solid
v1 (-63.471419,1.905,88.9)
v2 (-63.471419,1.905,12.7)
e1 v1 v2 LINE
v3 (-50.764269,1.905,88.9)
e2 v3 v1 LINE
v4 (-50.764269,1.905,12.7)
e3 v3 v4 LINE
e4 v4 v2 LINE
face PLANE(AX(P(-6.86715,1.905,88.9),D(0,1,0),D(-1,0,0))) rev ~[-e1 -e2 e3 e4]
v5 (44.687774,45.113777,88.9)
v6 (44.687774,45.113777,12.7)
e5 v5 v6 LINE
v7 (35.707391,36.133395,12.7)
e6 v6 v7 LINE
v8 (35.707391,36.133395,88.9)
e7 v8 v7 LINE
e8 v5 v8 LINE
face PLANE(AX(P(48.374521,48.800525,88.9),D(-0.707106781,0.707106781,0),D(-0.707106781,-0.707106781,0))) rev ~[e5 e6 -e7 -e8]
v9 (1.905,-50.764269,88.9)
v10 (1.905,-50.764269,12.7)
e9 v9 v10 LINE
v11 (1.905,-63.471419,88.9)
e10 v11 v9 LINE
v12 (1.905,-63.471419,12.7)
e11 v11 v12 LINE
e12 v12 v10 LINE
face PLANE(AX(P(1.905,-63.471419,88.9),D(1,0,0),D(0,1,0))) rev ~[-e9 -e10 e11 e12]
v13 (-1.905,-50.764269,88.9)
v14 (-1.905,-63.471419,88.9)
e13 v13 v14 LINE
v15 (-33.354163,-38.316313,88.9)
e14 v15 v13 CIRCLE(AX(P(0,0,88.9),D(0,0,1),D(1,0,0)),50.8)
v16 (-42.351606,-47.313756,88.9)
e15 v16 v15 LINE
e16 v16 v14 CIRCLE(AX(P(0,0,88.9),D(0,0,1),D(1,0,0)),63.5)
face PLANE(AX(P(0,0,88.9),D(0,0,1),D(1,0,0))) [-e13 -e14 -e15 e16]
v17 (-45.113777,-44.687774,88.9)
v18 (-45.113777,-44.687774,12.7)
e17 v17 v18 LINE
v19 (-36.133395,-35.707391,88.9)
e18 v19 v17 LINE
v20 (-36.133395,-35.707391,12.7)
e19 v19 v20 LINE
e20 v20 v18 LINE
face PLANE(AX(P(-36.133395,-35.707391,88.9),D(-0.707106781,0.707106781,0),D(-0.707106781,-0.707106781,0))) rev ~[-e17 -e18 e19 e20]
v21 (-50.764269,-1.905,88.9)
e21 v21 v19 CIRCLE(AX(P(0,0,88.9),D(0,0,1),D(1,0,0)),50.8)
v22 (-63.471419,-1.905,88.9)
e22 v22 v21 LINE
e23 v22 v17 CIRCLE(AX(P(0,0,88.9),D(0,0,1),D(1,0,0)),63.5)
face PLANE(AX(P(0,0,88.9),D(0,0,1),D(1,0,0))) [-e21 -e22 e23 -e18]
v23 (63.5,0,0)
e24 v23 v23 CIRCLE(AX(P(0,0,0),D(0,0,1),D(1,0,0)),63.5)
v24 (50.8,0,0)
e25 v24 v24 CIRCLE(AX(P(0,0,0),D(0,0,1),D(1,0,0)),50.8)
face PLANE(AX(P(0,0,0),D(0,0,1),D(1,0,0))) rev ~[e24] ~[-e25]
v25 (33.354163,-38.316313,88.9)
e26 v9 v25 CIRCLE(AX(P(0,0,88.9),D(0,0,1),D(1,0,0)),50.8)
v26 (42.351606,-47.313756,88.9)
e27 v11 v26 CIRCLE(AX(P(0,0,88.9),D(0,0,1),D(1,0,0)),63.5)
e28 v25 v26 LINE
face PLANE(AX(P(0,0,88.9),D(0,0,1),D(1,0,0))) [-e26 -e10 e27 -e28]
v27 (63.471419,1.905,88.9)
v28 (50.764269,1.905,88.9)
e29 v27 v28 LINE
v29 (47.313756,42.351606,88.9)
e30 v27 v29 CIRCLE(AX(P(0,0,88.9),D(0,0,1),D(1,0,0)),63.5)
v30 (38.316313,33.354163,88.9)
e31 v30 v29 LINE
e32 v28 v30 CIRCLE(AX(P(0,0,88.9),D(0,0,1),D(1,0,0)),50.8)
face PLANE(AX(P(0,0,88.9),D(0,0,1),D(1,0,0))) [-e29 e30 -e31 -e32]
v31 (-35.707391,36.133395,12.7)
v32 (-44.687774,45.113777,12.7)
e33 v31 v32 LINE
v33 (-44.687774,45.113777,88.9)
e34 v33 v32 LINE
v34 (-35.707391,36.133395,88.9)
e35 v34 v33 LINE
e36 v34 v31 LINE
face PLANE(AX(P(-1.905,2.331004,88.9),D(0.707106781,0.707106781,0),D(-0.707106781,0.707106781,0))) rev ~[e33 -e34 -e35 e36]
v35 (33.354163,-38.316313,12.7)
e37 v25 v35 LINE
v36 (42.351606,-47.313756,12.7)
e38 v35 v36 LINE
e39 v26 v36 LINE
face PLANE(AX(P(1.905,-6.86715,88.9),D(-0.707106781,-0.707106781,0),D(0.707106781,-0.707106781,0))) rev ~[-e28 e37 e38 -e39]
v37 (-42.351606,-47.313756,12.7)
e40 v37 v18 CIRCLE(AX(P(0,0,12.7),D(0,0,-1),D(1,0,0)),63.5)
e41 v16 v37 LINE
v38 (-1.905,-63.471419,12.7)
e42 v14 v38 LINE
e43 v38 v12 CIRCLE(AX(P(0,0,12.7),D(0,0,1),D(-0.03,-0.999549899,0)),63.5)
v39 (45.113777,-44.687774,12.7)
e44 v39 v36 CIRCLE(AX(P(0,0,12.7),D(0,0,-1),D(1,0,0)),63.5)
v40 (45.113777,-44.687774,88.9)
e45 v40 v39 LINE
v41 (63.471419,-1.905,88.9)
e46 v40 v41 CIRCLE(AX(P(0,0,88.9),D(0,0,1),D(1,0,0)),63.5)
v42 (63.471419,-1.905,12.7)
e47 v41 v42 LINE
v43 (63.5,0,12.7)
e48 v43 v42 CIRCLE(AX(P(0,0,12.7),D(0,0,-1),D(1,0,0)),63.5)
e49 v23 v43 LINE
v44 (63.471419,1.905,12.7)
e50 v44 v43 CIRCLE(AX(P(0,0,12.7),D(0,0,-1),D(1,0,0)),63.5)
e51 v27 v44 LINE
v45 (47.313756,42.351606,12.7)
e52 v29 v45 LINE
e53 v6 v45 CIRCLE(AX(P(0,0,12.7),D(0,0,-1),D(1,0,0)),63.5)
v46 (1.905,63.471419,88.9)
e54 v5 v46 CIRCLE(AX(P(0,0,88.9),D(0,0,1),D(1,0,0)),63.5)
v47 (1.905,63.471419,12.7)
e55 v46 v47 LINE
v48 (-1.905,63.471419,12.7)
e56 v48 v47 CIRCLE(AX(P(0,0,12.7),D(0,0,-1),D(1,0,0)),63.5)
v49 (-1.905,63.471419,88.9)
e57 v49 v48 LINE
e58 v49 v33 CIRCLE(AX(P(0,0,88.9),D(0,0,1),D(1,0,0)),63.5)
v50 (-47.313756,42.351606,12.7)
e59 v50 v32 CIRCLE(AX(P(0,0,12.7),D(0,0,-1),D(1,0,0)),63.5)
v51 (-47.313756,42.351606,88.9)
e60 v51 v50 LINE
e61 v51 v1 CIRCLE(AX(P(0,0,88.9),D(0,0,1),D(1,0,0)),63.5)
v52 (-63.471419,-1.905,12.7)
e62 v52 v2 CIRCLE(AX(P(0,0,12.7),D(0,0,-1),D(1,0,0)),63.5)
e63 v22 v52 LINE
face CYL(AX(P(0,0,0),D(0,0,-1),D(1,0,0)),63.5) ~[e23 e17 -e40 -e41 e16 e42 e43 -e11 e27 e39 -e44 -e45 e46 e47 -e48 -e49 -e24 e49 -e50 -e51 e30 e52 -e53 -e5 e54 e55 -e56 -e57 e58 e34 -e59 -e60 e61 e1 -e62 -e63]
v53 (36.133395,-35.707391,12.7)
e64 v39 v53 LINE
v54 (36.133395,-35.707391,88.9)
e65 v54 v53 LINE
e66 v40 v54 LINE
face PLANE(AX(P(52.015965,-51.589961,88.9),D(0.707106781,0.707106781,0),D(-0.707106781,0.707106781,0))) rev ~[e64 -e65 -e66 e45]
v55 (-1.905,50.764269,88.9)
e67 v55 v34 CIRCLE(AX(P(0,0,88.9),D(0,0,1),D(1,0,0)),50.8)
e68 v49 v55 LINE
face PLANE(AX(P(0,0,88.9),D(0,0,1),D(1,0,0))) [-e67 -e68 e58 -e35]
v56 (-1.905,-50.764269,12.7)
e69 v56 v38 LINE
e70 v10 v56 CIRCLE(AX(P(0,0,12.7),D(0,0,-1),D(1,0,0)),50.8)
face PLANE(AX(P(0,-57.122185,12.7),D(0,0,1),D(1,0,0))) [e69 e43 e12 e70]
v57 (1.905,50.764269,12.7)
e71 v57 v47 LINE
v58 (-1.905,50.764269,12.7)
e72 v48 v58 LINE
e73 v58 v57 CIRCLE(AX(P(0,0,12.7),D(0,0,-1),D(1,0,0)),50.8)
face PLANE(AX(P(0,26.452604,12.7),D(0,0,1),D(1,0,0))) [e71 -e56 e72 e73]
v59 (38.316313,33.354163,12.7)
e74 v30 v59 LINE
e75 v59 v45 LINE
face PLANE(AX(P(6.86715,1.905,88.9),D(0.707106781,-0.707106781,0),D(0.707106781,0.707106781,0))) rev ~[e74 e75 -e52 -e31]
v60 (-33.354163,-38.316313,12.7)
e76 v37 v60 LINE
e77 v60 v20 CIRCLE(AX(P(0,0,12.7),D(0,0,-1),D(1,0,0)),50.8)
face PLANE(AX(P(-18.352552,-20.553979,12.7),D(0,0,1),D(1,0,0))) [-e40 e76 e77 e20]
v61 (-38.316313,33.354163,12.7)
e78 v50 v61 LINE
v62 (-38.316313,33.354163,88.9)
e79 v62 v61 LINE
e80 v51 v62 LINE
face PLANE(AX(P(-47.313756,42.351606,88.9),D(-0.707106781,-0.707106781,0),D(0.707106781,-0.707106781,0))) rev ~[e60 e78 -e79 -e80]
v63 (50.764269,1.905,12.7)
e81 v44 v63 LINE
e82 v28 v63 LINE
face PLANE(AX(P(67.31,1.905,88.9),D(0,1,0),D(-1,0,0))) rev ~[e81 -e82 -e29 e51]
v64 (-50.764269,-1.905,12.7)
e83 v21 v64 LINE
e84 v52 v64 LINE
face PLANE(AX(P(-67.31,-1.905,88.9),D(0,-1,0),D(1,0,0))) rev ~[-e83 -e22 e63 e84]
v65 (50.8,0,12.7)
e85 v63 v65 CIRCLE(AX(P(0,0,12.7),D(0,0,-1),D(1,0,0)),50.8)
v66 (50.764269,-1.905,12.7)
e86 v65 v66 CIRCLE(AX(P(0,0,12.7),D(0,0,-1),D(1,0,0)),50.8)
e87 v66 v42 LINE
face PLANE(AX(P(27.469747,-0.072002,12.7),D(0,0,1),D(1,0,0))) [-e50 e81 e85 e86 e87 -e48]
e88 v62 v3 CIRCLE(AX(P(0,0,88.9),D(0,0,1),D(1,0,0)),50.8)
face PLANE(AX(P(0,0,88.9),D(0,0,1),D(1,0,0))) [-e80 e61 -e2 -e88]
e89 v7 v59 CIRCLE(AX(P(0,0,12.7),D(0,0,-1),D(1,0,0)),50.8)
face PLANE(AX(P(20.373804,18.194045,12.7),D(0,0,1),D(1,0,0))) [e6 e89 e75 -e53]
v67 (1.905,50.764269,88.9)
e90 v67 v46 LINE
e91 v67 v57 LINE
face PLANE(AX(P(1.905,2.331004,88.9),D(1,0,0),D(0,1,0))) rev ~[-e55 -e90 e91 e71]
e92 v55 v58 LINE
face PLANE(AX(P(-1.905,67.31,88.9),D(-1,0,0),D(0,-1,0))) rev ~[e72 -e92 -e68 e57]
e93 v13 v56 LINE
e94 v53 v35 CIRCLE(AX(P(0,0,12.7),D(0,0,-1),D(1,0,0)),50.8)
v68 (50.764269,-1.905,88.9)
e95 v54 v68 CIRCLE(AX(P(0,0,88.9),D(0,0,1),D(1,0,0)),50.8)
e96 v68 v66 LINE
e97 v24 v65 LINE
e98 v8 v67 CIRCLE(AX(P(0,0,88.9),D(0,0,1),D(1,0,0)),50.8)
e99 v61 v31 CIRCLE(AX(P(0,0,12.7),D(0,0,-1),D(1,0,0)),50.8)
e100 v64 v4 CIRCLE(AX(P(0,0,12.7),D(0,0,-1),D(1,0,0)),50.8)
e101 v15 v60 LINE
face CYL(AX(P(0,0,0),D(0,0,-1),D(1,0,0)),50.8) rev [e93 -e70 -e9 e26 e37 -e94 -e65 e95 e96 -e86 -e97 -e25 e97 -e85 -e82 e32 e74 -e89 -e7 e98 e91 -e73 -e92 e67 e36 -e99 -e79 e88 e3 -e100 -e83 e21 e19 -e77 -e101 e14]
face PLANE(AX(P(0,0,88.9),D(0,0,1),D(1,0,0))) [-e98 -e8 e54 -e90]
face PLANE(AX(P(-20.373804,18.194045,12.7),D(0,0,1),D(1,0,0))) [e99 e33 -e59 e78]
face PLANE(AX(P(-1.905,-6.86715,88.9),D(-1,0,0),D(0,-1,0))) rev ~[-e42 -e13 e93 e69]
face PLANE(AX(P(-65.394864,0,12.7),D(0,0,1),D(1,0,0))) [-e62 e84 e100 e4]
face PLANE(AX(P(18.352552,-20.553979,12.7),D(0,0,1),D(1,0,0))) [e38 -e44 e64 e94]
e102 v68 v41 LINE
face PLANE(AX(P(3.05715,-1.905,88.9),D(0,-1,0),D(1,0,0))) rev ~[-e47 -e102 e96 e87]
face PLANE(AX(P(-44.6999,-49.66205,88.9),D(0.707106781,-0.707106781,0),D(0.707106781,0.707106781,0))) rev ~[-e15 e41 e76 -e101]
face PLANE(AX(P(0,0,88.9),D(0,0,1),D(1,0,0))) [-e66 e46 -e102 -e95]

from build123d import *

# Parameters (mm, degrees)
F0_R     = 63.5
F0_R_2   = 50.8
F1_DEPTH = 88.9
F4_DEPTH = 76.2


# Not quite as in the source:
# - a feature of the source that left no trace in its solid (it failed there, or was rolled back) is left out


with BuildPart() as f1:
    # F0 (on Top) → F1 (new body)
    with BuildSketch(Plane.XY):
        Circle(F0_R)
        Circle(F0_R_2, mode=Mode.SUBTRACT)
    extrude(amount=F1_DEPTH)

    # F3 (on face) → F4 (cut)
    with BuildSketch(Plane.XY.offset(88.9)):
        with BuildLine():
            Line((-1.905, -6.8671500075), (-1.905, -3.0571500075))
            Line((-1.905, -3.0571500075), (-2.6940768363, -2.2680731712))
            Line((-2.6940768363, -2.2680731712), (-36.1333947901, -35.7073911249))
            ThreePointArc((-36.1333947901, -35.7073911249), (-34.768258257, -37.0379294477), (-33.3541627773, -38.3163127848))
            Line((-33.3541627773, -38.3163127848), (-1.905, -6.8671500075))
        make_face()
        with BuildLine():
            ThreePointArc((-45.1137772181, -44.6877735529), (-43.7523970967, -46.0214922432), (-42.3516057863, -47.3137557938))
            Line((-42.3516057863, -47.3137557938), (-33.3541627773, -38.3163127848))
            ThreePointArc((-33.3541627773, -38.3163127848), (-34.768258257, -37.0379294477), (-36.1333947901, -35.7073911249))
            Line((-36.1333947901, -35.7073911249), (-45.1137772181, -44.6877735529))
        make_face()
        with BuildLine():
            Line((-44.6998995402, -49.6620495477), (-42.3516057863, -47.3137557938))
            ThreePointArc((-42.3516057863, -47.3137557938), (-43.7523970967, -46.0214922432), (-45.1137772181, -44.6877735529))
            Line((-45.1137772181, -44.6877735529), (-47.3939763765, -46.9679727114))
            Line((-47.3939763765, -46.9679727114), (-44.6998995402, -49.6620495477))
        make_face()
        with BuildLine():
            Line((-67.31, -1.905), (-63.4714185677, -1.905))
            ThreePointArc((-63.4714185677, -1.905), (-63.5, 0), (-63.4714185677, 1.905))
            Line((-63.4714185677, 1.905), (-67.31, 1.905))
            Line((-67.31, 1.905), (-67.31, -1.905))
        make_face()
        with BuildLine():
            ThreePointArc((-63.4714185677, 1.905), (-63.5, 0), (-63.4714185677, -1.905))
            Line((-63.4714185677, -1.905), (-50.7642686838, -1.905))
            ThreePointArc((-50.7642686838, -1.905), (-50.8, 0), (-50.7642686838, 1.905))
            Line((-50.7642686838, 1.905), (-63.4714185677, 1.905))
        make_face()
        with BuildLine():
            Line((-50.7642686838, -1.905), (-3.0571500075, -1.905))
            Line((-3.0571500075, -1.905), (-6.8671500075, 1.905))
            Line((-6.8671500075, 1.905), (-50.7642686838, 1.905))
            ThreePointArc((-50.7642686838, 1.905), (-50.8, 0), (-50.7642686838, -1.905))
        make_face()
        with BuildLine():
            Line((-6.8671500075, 1.905), (-1.905, 1.905))
            Line((-1.905, 1.905), (-1.905, 2.3310036652))
            Line((-1.905, 2.3310036652), (-35.7073911249, 36.1333947901))
            ThreePointArc((-35.7073911249, 36.1333947901), (-37.0379294477, 34.768258257), (-38.3163127848, 33.3541627773))
            Line((-38.3163127848, 33.3541627773), (-6.8671500075, 1.905))
        make_face()
        with BuildLine():
            Line((1.905, 1.905), (6.8671500075, 1.905))
            Line((6.8671500075, 1.905), (38.3163127848, 33.3541627773))
            ThreePointArc((38.3163127848, 33.3541627773), (37.0379294477, 34.768258257), (35.7073911249, 36.1333947901))
            Line((35.7073911249, 36.1333947901), (1.905, 2.3310036652))
            Line((1.905, 2.3310036652), (1.905, 1.905))
        make_face()
        with BuildLine():
            Line((3.0571500075, -1.905), (50.7642686838, -1.905))
            ThreePointArc((50.7642686838, -1.905), (50.7910663854, -0.9526675347), (50.8, 0))
            ThreePointArc((50.8, 0), (50.7910663854, 0.9526675347), (50.7642686838, 1.905))
            Line((50.7642686838, 1.905), (6.8671500075, 1.905))
            Line((6.8671500075, 1.905), (3.0571500075, -1.905))
        make_face()
        with BuildLine():
            Line((50.7642686838, -1.905), (63.4714185677, -1.905))
            ThreePointArc((63.4714185677, -1.905), (63.4928542399, -0.9526071985), (63.5, 0))
            ThreePointArc((63.5, 0), (63.4928542399, 0.9526071985), (63.4714185677, 1.905))
            Line((63.4714185677, 1.905), (50.7642686838, 1.905))
            ThreePointArc((50.7642686838, 1.905), (50.7910663854, 0.9526675347), (50.8, 0))
            ThreePointArc((50.8, 0), (50.7910663854, -0.9526675347), (50.7642686838, -1.905))
        make_face()
        with BuildLine():
            Line((38.3163127848, 33.3541627773), (47.3137557938, 42.3516057863))
            ThreePointArc((47.3137557938, 42.3516057863), (46.0214922432, 43.7523970967), (44.6877735529, 45.1137772181))
            Line((44.6877735529, 45.1137772181), (35.7073911249, 36.1333947901))
            ThreePointArc((35.7073911249, 36.1333947901), (37.0379294477, 34.768258257), (38.3163127848, 33.3541627773))
        make_face()
        with BuildLine():
            ThreePointArc((33.3541627773, -38.3163127848), (34.768258257, -37.0379294477), (36.1333947901, -35.7073911249))
            Line((36.1333947901, -35.7073911249), (2.6940768363, -2.2680731712))
            Line((2.6940768363, -2.2680731712), (1.905, -3.0571500075))
            Line((1.905, -3.0571500075), (1.905, -6.8671500075))
            Line((1.905, -6.8671500075), (33.3541627773, -38.3163127848))
        make_face()
        with BuildLine():
            ThreePointArc((42.3516057863, -47.3137557938), (43.7523970967, -46.0214922432), (45.1137772181, -44.6877735529))
            Line((45.1137772181, -44.6877735529), (36.1333947901, -35.7073911249))
            ThreePointArc((36.1333947901, -35.7073911249), (34.768258257, -37.0379294477), (33.3541627773, -38.3163127848))
            Line((33.3541627773, -38.3163127848), (42.3516057863, -47.3137557938))
        make_face()
        with BuildLine():
            Line((52.015964851, -51.5899611858), (45.1137772181, -44.6877735529))
            ThreePointArc((45.1137772181, -44.6877735529), (43.7523970967, -46.0214922432), (42.3516057863, -47.3137557938))
            Line((42.3516057863, -47.3137557938), (49.3218880147, -54.2840380222))
            Line((49.3218880147, -54.2840380222), (52.015964851, -51.5899611858))
        make_face()
        with BuildLine():
            Line((63.4714185677, -1.905), (67.31, -1.905))
            Line((67.31, -1.905), (67.31, 1.905))
            Line((67.31, 1.905), (63.4714185677, 1.905))
            ThreePointArc((63.4714185677, 1.905), (63.4928542399, 0.9526071985), (63.5, 0))
            ThreePointArc((63.5, 0), (63.4928542399, -0.9526071985), (63.4714185677, -1.905))
        make_face()
        with BuildLine():
            ThreePointArc((44.6877735529, 45.1137772181), (46.0214922432, 43.7523970967), (47.3137557938, 42.3516057863))
            Line((47.3137557938, 42.3516057863), (51.0685980704, 46.106448063))
            Line((51.0685980704, 46.106448063), (48.3745212341, 48.8005248993))
            Line((48.3745212341, 48.8005248993), (44.6877735529, 45.1137772181))
        make_face()
        with BuildLine():
            Line((-35.7073911249, 36.1333947901), (-44.6877735529, 45.1137772181))
            ThreePointArc((-44.6877735529, 45.1137772181), (-46.0214922432, 43.7523970967), (-47.3137557938, 42.3516057863))
            Line((-47.3137557938, 42.3516057863), (-38.3163127848, 33.3541627773))
            ThreePointArc((-38.3163127848, 33.3541627773), (-37.0379294477, 34.768258257), (-35.7073911249, 36.1333947901))
        make_face()
        with BuildLine():
            Line((-1.4789963348, 1.905), (1.4789963348, 1.905))
            Line((1.4789963348, 1.905), (1.905, 2.3310036652))
            Line((1.905, 2.3310036652), (1.905, 50.7642686838))
            ThreePointArc((1.905, 50.7642686838), (0, 50.8), (-1.905, 50.7642686838))
            Line((-1.905, 50.7642686838), (-1.905, 2.3310036652))
            Line((-1.905, 2.3310036652), (-1.4789963348, 1.905))
        make_face()
        with BuildLine():
            Line((1.905, 50.7642686838), (1.905, 63.4714185677))
            ThreePointArc((1.905, 63.4714185677), (0, 63.5), (-1.905, 63.4714185677))
            Line((-1.905, 63.4714185677), (-1.905, 50.7642686838))
            ThreePointArc((-1.905, 50.7642686838), (0, 50.8), (1.905, 50.7642686838))
        make_face()
        with BuildLine():
            ThreePointArc((-47.3137557938, 42.3516057863), (-46.0214922432, 43.7523970967), (-44.6877735529, 45.1137772181))
            Line((-44.6877735529, 45.1137772181), (-47.5721312908, 47.998134956))
            Line((-47.5721312908, 47.998134956), (-50.2662081271, 45.3040581197))
            Line((-50.2662081271, 45.3040581197), (-47.3137557938, 42.3516057863))
        make_face()
        with BuildLine():
            ThreePointArc((-1.905, 63.4714185677), (0, 63.5), (1.905, 63.4714185677))
            Line((1.905, 63.4714185677), (1.905, 67.31))
            Line((1.905, 67.31), (-1.905, 67.31))
            Line((-1.905, 67.31), (-1.905, 63.4714185677))
        make_face()
        with BuildLine():
            ThreePointArc((-1.905, -63.4714185677), (0, -63.5), (1.905, -63.4714185677))
            Line((1.905, -63.4714185677), (1.905, -50.7642686838))
            ThreePointArc((1.905, -50.7642686838), (0, -50.8), (-1.905, -50.7642686838))
            Line((-1.905, -50.7642686838), (-1.905, -63.4714185677))
        make_face()
        with BuildLine():
            Line((1.905, -50.7642686838), (1.905, -6.8671500075))
            Line((1.905, -6.8671500075), (0, -4.9621500075))
            Line((0, -4.9621500075), (-1.905, -6.8671500075))
            Line((-1.905, -6.8671500075), (-1.905, -50.7642686838))
            ThreePointArc((-1.905, -50.7642686838), (0, -50.8), (1.905, -50.7642686838))
        make_face()
    extrude(amount=-F4_DEPTH, mode=Mode.SUBTRACT)


solid = f1.part
